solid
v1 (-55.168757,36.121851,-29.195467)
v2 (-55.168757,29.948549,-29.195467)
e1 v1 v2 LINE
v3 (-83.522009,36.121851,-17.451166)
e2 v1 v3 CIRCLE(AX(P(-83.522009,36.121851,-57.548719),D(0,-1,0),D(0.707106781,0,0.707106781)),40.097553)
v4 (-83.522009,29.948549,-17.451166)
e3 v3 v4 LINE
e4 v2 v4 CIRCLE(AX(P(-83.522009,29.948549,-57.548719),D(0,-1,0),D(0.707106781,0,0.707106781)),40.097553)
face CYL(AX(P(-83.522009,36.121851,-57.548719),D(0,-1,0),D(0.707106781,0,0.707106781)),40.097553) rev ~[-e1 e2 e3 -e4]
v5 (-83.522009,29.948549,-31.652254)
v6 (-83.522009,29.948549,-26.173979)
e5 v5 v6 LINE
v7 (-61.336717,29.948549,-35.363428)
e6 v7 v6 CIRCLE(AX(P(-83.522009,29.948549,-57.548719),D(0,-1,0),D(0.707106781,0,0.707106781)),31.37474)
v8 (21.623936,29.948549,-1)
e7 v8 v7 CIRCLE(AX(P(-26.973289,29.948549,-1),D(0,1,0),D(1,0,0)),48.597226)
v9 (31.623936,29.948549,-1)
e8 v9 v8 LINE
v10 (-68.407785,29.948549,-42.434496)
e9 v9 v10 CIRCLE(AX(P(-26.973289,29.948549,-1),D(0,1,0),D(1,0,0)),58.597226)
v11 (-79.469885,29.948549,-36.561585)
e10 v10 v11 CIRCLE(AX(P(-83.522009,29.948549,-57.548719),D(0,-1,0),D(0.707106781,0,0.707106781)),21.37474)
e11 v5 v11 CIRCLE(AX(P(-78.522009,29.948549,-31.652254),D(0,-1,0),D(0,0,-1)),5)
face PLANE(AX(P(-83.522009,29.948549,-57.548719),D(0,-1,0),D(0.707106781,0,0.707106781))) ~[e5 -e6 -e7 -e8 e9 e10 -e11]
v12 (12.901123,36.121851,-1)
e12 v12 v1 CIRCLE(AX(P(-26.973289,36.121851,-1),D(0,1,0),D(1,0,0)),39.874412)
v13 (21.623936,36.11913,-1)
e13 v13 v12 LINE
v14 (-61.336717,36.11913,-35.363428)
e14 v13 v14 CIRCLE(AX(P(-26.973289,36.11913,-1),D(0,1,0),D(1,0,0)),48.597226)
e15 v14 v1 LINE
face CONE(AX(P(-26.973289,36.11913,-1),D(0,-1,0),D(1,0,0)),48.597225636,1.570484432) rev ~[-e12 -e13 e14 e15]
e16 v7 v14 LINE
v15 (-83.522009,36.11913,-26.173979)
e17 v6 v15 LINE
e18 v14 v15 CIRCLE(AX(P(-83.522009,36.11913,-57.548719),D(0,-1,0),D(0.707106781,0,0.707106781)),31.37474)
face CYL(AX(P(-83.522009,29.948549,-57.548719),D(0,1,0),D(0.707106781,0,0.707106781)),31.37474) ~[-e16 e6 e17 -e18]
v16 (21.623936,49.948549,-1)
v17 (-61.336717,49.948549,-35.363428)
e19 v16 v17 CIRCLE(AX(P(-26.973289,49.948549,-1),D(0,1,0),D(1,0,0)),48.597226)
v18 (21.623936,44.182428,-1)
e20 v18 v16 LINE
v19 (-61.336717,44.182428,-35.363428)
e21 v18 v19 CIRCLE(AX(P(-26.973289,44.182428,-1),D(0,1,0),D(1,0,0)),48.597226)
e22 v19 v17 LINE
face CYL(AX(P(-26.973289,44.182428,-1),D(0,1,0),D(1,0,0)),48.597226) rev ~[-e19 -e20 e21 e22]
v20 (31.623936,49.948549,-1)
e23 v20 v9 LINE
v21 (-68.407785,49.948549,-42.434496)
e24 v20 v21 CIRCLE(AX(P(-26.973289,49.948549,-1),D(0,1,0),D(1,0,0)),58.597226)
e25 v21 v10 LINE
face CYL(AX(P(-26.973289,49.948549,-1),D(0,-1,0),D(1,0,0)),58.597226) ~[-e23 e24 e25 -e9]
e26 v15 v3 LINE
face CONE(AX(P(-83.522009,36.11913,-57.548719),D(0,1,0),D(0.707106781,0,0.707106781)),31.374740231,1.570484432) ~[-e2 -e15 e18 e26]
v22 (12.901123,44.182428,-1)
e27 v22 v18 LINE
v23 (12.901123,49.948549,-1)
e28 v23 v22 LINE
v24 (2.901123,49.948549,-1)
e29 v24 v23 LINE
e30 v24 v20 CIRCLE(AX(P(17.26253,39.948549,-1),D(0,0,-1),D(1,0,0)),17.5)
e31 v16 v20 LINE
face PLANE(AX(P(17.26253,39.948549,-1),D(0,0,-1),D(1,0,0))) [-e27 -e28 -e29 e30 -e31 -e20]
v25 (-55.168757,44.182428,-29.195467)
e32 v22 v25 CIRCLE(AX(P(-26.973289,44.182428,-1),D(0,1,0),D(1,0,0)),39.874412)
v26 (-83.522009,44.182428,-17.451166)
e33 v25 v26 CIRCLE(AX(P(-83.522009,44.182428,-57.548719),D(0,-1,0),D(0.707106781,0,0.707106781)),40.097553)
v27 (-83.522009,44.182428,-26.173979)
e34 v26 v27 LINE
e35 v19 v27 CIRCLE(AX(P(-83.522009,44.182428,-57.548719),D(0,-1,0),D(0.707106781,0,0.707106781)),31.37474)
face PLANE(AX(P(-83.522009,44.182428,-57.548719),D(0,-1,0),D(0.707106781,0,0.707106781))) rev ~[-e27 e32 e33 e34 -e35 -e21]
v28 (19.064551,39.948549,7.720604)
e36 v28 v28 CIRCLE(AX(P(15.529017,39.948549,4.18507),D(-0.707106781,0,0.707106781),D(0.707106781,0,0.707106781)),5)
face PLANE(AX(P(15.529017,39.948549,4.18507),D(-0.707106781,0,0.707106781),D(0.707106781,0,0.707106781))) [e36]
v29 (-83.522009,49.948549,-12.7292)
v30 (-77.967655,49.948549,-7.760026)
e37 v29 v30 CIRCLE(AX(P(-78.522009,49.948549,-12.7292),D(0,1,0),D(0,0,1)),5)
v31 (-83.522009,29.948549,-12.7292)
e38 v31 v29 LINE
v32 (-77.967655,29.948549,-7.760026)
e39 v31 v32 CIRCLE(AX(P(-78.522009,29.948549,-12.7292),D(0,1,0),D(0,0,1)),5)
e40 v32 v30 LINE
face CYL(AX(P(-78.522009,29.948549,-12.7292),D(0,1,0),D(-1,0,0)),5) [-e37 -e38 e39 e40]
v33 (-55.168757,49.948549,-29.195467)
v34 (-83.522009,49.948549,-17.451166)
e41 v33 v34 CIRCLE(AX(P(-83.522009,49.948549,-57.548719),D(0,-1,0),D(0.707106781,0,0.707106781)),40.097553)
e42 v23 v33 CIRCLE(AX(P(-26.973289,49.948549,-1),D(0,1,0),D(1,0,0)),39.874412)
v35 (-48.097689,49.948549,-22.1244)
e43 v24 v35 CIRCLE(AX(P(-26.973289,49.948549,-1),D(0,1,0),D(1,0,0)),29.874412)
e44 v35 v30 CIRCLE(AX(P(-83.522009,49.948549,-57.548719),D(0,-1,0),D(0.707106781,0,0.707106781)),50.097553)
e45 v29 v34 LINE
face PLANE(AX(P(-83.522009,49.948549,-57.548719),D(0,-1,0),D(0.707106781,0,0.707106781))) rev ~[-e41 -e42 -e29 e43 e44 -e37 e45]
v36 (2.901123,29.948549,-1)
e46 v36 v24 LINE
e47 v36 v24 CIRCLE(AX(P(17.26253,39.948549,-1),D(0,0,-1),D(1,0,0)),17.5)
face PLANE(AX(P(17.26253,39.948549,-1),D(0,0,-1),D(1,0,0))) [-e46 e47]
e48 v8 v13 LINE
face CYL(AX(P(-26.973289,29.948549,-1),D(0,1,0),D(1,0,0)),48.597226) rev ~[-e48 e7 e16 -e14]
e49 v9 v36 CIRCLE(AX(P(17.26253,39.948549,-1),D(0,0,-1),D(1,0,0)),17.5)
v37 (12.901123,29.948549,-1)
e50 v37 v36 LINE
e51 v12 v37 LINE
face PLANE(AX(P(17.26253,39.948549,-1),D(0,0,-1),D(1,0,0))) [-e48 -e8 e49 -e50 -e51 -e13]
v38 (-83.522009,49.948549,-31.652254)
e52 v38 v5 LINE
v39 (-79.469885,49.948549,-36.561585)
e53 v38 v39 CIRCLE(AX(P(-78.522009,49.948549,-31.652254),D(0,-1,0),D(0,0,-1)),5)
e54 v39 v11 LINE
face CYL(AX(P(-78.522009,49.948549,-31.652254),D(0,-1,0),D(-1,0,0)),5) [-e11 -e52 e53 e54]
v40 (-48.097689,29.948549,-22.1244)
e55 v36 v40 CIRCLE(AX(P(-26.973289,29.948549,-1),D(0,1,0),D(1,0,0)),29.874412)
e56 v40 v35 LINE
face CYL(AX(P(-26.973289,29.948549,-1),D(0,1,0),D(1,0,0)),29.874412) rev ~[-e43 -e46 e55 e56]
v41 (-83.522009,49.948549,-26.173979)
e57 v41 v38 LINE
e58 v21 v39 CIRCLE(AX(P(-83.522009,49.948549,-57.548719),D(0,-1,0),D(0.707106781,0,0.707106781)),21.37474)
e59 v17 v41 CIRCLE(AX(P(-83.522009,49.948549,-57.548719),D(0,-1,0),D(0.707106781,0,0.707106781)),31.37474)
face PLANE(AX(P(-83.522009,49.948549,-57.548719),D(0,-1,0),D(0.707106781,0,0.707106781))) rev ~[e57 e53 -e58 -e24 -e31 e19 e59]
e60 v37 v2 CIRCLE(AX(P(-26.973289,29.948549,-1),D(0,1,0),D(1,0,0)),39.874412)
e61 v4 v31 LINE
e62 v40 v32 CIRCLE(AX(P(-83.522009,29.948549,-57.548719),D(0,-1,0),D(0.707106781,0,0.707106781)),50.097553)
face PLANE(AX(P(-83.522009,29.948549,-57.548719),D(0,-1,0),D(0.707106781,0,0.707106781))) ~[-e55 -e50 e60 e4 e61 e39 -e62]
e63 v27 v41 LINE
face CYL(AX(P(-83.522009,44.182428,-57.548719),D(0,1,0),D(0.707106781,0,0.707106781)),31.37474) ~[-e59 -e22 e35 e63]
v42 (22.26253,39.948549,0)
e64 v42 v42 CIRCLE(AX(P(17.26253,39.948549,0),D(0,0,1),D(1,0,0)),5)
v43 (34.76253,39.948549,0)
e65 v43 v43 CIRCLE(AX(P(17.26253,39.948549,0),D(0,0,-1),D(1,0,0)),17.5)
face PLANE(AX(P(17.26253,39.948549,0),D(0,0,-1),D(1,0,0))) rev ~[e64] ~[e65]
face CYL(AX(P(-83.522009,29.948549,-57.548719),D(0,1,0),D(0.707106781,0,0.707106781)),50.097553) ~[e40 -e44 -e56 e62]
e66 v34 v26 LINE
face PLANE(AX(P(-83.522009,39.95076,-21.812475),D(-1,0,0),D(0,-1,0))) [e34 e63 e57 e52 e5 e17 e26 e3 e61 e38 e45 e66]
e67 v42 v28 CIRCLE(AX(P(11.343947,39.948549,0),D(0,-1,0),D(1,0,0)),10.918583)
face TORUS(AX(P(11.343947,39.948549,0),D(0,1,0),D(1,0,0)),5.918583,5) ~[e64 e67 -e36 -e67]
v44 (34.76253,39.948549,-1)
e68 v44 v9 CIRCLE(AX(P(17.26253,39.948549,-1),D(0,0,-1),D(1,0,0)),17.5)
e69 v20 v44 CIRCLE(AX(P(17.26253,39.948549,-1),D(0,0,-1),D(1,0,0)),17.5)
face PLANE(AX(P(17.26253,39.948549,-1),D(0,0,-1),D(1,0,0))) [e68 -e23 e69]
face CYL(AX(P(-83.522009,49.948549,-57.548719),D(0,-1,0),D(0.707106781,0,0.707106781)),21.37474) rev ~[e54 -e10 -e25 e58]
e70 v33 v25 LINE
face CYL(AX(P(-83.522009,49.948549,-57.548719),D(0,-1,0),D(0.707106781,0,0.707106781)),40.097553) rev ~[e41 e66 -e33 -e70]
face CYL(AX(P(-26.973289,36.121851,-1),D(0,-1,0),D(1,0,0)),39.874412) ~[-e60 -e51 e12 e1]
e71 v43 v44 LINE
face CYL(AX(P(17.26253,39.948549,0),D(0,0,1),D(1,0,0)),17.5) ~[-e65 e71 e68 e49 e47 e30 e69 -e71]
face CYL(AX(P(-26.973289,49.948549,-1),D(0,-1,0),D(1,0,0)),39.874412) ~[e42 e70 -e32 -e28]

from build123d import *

# Parameters (mm, degrees)
F0_R     = 5
F1_ANGLE = 45
F2_R     = 17.5
F2_R_2   = 5
F3_DEPTH = 1
F5_ANGLE = 135
F7_ANGLE = 45
F8_R     = 5
F9_R     = 5


with BuildPart() as f1:
    # F0 (on Top) → F1 (revolve)
    with BuildSketch(Plane.XY):
        with Locations((17.2625295818, 39.9485491216)):
            Circle(F0_R)
    revolve(axis=Axis((11.3439466804, 38.7977138162, 0), (0, -1, 0)), revolution_arc=F1_ANGLE)

    # F2 (on face) → F3 (join)
    with BuildSketch(Plane(origin=(0, 0, 0), x_dir=(1, 0, 0), z_dir=(0, 0, -1))):
        with Locations((17.2625295818, -39.9485491216)):
            Circle(F2_R)
        with Locations((17.2625295818, -39.9485491216)):
            Circle(F2_R_2, mode=Mode.SUBTRACT)
        with Locations((17.2625295818, -39.9485491216)):
            Circle(F2_R_2)
    extrude(amount=F3_DEPTH)

    # F4 (on face) → F5 (revolve)
    with BuildSketch(Plane(origin=(0, 0, -1), x_dir=(1, 0, 0), z_dir=(0, 0, -1))):
        Polygon((12.9011229654, -29.9485491216), (2.9011229654, -29.9485491216), (2.9011229654, -49.9485491216), (12.9011229654, -49.9485491216), (12.9011229654, -44.1824280606), (21.6239361981, -44.1824280606), (21.6239361981, -49.9485491216), (31.6239361981, -49.9485491216), (31.6239361981, -29.9485491216), (21.6239361981, -29.9485491216), (21.6239361981, -36.1191299331), (12.9011229654, -36.1218505295), align=None)
    revolve(axis=Axis((-26.9732894376, 40.484293364, -1), (0, 1, 0)), revolution_arc=F5_ANGLE)

    # F6 (on face) → F7 (revolve)
    with BuildSketch(Plane(origin=(-12.9866447188, 0, 12.9866447188), x_dir=(0, -1, 0), z_dir=(-0.7071067812, 0, 0.7071067812))):
        Polygon((-36.1218505295, -59.6545150564), (-29.9485491216, -59.6545150564), (-29.9485491216, -49.6545150564), (-49.9485491216, -49.6545150564), (-49.9485491216, -59.6545150564), (-44.1824280606, -59.6545150564), (-44.1824280606, -68.3773282891), (-49.9485491216, -68.3773282891), (-49.9485491216, -78.3773282891), (-29.9485491216, -78.3773282891), (-29.9485491216, -68.3773282891), (-36.1191299331, -68.3773282891), align=None)
    revolve(axis=Axis((-83.5220088064, 42.3686988652, -57.5487193688), (0, -1, 0)), revolution_arc=F7_ANGLE)

    # F8
    f8_edges = [f1.edges().sort_by_distance(p)[0] for p in [
        (-83.522009, 39.948549, -36.173979),
    ]]
    fillet(f8_edges, radius=F8_R)

    # F9
    f9_edges = [f1.edges().sort_by_distance(p)[0] for p in [
        (-83.522009, 39.948549, -7.451166),
    ]]
    fillet(f9_edges, radius=F9_R)


solid = f1.part
